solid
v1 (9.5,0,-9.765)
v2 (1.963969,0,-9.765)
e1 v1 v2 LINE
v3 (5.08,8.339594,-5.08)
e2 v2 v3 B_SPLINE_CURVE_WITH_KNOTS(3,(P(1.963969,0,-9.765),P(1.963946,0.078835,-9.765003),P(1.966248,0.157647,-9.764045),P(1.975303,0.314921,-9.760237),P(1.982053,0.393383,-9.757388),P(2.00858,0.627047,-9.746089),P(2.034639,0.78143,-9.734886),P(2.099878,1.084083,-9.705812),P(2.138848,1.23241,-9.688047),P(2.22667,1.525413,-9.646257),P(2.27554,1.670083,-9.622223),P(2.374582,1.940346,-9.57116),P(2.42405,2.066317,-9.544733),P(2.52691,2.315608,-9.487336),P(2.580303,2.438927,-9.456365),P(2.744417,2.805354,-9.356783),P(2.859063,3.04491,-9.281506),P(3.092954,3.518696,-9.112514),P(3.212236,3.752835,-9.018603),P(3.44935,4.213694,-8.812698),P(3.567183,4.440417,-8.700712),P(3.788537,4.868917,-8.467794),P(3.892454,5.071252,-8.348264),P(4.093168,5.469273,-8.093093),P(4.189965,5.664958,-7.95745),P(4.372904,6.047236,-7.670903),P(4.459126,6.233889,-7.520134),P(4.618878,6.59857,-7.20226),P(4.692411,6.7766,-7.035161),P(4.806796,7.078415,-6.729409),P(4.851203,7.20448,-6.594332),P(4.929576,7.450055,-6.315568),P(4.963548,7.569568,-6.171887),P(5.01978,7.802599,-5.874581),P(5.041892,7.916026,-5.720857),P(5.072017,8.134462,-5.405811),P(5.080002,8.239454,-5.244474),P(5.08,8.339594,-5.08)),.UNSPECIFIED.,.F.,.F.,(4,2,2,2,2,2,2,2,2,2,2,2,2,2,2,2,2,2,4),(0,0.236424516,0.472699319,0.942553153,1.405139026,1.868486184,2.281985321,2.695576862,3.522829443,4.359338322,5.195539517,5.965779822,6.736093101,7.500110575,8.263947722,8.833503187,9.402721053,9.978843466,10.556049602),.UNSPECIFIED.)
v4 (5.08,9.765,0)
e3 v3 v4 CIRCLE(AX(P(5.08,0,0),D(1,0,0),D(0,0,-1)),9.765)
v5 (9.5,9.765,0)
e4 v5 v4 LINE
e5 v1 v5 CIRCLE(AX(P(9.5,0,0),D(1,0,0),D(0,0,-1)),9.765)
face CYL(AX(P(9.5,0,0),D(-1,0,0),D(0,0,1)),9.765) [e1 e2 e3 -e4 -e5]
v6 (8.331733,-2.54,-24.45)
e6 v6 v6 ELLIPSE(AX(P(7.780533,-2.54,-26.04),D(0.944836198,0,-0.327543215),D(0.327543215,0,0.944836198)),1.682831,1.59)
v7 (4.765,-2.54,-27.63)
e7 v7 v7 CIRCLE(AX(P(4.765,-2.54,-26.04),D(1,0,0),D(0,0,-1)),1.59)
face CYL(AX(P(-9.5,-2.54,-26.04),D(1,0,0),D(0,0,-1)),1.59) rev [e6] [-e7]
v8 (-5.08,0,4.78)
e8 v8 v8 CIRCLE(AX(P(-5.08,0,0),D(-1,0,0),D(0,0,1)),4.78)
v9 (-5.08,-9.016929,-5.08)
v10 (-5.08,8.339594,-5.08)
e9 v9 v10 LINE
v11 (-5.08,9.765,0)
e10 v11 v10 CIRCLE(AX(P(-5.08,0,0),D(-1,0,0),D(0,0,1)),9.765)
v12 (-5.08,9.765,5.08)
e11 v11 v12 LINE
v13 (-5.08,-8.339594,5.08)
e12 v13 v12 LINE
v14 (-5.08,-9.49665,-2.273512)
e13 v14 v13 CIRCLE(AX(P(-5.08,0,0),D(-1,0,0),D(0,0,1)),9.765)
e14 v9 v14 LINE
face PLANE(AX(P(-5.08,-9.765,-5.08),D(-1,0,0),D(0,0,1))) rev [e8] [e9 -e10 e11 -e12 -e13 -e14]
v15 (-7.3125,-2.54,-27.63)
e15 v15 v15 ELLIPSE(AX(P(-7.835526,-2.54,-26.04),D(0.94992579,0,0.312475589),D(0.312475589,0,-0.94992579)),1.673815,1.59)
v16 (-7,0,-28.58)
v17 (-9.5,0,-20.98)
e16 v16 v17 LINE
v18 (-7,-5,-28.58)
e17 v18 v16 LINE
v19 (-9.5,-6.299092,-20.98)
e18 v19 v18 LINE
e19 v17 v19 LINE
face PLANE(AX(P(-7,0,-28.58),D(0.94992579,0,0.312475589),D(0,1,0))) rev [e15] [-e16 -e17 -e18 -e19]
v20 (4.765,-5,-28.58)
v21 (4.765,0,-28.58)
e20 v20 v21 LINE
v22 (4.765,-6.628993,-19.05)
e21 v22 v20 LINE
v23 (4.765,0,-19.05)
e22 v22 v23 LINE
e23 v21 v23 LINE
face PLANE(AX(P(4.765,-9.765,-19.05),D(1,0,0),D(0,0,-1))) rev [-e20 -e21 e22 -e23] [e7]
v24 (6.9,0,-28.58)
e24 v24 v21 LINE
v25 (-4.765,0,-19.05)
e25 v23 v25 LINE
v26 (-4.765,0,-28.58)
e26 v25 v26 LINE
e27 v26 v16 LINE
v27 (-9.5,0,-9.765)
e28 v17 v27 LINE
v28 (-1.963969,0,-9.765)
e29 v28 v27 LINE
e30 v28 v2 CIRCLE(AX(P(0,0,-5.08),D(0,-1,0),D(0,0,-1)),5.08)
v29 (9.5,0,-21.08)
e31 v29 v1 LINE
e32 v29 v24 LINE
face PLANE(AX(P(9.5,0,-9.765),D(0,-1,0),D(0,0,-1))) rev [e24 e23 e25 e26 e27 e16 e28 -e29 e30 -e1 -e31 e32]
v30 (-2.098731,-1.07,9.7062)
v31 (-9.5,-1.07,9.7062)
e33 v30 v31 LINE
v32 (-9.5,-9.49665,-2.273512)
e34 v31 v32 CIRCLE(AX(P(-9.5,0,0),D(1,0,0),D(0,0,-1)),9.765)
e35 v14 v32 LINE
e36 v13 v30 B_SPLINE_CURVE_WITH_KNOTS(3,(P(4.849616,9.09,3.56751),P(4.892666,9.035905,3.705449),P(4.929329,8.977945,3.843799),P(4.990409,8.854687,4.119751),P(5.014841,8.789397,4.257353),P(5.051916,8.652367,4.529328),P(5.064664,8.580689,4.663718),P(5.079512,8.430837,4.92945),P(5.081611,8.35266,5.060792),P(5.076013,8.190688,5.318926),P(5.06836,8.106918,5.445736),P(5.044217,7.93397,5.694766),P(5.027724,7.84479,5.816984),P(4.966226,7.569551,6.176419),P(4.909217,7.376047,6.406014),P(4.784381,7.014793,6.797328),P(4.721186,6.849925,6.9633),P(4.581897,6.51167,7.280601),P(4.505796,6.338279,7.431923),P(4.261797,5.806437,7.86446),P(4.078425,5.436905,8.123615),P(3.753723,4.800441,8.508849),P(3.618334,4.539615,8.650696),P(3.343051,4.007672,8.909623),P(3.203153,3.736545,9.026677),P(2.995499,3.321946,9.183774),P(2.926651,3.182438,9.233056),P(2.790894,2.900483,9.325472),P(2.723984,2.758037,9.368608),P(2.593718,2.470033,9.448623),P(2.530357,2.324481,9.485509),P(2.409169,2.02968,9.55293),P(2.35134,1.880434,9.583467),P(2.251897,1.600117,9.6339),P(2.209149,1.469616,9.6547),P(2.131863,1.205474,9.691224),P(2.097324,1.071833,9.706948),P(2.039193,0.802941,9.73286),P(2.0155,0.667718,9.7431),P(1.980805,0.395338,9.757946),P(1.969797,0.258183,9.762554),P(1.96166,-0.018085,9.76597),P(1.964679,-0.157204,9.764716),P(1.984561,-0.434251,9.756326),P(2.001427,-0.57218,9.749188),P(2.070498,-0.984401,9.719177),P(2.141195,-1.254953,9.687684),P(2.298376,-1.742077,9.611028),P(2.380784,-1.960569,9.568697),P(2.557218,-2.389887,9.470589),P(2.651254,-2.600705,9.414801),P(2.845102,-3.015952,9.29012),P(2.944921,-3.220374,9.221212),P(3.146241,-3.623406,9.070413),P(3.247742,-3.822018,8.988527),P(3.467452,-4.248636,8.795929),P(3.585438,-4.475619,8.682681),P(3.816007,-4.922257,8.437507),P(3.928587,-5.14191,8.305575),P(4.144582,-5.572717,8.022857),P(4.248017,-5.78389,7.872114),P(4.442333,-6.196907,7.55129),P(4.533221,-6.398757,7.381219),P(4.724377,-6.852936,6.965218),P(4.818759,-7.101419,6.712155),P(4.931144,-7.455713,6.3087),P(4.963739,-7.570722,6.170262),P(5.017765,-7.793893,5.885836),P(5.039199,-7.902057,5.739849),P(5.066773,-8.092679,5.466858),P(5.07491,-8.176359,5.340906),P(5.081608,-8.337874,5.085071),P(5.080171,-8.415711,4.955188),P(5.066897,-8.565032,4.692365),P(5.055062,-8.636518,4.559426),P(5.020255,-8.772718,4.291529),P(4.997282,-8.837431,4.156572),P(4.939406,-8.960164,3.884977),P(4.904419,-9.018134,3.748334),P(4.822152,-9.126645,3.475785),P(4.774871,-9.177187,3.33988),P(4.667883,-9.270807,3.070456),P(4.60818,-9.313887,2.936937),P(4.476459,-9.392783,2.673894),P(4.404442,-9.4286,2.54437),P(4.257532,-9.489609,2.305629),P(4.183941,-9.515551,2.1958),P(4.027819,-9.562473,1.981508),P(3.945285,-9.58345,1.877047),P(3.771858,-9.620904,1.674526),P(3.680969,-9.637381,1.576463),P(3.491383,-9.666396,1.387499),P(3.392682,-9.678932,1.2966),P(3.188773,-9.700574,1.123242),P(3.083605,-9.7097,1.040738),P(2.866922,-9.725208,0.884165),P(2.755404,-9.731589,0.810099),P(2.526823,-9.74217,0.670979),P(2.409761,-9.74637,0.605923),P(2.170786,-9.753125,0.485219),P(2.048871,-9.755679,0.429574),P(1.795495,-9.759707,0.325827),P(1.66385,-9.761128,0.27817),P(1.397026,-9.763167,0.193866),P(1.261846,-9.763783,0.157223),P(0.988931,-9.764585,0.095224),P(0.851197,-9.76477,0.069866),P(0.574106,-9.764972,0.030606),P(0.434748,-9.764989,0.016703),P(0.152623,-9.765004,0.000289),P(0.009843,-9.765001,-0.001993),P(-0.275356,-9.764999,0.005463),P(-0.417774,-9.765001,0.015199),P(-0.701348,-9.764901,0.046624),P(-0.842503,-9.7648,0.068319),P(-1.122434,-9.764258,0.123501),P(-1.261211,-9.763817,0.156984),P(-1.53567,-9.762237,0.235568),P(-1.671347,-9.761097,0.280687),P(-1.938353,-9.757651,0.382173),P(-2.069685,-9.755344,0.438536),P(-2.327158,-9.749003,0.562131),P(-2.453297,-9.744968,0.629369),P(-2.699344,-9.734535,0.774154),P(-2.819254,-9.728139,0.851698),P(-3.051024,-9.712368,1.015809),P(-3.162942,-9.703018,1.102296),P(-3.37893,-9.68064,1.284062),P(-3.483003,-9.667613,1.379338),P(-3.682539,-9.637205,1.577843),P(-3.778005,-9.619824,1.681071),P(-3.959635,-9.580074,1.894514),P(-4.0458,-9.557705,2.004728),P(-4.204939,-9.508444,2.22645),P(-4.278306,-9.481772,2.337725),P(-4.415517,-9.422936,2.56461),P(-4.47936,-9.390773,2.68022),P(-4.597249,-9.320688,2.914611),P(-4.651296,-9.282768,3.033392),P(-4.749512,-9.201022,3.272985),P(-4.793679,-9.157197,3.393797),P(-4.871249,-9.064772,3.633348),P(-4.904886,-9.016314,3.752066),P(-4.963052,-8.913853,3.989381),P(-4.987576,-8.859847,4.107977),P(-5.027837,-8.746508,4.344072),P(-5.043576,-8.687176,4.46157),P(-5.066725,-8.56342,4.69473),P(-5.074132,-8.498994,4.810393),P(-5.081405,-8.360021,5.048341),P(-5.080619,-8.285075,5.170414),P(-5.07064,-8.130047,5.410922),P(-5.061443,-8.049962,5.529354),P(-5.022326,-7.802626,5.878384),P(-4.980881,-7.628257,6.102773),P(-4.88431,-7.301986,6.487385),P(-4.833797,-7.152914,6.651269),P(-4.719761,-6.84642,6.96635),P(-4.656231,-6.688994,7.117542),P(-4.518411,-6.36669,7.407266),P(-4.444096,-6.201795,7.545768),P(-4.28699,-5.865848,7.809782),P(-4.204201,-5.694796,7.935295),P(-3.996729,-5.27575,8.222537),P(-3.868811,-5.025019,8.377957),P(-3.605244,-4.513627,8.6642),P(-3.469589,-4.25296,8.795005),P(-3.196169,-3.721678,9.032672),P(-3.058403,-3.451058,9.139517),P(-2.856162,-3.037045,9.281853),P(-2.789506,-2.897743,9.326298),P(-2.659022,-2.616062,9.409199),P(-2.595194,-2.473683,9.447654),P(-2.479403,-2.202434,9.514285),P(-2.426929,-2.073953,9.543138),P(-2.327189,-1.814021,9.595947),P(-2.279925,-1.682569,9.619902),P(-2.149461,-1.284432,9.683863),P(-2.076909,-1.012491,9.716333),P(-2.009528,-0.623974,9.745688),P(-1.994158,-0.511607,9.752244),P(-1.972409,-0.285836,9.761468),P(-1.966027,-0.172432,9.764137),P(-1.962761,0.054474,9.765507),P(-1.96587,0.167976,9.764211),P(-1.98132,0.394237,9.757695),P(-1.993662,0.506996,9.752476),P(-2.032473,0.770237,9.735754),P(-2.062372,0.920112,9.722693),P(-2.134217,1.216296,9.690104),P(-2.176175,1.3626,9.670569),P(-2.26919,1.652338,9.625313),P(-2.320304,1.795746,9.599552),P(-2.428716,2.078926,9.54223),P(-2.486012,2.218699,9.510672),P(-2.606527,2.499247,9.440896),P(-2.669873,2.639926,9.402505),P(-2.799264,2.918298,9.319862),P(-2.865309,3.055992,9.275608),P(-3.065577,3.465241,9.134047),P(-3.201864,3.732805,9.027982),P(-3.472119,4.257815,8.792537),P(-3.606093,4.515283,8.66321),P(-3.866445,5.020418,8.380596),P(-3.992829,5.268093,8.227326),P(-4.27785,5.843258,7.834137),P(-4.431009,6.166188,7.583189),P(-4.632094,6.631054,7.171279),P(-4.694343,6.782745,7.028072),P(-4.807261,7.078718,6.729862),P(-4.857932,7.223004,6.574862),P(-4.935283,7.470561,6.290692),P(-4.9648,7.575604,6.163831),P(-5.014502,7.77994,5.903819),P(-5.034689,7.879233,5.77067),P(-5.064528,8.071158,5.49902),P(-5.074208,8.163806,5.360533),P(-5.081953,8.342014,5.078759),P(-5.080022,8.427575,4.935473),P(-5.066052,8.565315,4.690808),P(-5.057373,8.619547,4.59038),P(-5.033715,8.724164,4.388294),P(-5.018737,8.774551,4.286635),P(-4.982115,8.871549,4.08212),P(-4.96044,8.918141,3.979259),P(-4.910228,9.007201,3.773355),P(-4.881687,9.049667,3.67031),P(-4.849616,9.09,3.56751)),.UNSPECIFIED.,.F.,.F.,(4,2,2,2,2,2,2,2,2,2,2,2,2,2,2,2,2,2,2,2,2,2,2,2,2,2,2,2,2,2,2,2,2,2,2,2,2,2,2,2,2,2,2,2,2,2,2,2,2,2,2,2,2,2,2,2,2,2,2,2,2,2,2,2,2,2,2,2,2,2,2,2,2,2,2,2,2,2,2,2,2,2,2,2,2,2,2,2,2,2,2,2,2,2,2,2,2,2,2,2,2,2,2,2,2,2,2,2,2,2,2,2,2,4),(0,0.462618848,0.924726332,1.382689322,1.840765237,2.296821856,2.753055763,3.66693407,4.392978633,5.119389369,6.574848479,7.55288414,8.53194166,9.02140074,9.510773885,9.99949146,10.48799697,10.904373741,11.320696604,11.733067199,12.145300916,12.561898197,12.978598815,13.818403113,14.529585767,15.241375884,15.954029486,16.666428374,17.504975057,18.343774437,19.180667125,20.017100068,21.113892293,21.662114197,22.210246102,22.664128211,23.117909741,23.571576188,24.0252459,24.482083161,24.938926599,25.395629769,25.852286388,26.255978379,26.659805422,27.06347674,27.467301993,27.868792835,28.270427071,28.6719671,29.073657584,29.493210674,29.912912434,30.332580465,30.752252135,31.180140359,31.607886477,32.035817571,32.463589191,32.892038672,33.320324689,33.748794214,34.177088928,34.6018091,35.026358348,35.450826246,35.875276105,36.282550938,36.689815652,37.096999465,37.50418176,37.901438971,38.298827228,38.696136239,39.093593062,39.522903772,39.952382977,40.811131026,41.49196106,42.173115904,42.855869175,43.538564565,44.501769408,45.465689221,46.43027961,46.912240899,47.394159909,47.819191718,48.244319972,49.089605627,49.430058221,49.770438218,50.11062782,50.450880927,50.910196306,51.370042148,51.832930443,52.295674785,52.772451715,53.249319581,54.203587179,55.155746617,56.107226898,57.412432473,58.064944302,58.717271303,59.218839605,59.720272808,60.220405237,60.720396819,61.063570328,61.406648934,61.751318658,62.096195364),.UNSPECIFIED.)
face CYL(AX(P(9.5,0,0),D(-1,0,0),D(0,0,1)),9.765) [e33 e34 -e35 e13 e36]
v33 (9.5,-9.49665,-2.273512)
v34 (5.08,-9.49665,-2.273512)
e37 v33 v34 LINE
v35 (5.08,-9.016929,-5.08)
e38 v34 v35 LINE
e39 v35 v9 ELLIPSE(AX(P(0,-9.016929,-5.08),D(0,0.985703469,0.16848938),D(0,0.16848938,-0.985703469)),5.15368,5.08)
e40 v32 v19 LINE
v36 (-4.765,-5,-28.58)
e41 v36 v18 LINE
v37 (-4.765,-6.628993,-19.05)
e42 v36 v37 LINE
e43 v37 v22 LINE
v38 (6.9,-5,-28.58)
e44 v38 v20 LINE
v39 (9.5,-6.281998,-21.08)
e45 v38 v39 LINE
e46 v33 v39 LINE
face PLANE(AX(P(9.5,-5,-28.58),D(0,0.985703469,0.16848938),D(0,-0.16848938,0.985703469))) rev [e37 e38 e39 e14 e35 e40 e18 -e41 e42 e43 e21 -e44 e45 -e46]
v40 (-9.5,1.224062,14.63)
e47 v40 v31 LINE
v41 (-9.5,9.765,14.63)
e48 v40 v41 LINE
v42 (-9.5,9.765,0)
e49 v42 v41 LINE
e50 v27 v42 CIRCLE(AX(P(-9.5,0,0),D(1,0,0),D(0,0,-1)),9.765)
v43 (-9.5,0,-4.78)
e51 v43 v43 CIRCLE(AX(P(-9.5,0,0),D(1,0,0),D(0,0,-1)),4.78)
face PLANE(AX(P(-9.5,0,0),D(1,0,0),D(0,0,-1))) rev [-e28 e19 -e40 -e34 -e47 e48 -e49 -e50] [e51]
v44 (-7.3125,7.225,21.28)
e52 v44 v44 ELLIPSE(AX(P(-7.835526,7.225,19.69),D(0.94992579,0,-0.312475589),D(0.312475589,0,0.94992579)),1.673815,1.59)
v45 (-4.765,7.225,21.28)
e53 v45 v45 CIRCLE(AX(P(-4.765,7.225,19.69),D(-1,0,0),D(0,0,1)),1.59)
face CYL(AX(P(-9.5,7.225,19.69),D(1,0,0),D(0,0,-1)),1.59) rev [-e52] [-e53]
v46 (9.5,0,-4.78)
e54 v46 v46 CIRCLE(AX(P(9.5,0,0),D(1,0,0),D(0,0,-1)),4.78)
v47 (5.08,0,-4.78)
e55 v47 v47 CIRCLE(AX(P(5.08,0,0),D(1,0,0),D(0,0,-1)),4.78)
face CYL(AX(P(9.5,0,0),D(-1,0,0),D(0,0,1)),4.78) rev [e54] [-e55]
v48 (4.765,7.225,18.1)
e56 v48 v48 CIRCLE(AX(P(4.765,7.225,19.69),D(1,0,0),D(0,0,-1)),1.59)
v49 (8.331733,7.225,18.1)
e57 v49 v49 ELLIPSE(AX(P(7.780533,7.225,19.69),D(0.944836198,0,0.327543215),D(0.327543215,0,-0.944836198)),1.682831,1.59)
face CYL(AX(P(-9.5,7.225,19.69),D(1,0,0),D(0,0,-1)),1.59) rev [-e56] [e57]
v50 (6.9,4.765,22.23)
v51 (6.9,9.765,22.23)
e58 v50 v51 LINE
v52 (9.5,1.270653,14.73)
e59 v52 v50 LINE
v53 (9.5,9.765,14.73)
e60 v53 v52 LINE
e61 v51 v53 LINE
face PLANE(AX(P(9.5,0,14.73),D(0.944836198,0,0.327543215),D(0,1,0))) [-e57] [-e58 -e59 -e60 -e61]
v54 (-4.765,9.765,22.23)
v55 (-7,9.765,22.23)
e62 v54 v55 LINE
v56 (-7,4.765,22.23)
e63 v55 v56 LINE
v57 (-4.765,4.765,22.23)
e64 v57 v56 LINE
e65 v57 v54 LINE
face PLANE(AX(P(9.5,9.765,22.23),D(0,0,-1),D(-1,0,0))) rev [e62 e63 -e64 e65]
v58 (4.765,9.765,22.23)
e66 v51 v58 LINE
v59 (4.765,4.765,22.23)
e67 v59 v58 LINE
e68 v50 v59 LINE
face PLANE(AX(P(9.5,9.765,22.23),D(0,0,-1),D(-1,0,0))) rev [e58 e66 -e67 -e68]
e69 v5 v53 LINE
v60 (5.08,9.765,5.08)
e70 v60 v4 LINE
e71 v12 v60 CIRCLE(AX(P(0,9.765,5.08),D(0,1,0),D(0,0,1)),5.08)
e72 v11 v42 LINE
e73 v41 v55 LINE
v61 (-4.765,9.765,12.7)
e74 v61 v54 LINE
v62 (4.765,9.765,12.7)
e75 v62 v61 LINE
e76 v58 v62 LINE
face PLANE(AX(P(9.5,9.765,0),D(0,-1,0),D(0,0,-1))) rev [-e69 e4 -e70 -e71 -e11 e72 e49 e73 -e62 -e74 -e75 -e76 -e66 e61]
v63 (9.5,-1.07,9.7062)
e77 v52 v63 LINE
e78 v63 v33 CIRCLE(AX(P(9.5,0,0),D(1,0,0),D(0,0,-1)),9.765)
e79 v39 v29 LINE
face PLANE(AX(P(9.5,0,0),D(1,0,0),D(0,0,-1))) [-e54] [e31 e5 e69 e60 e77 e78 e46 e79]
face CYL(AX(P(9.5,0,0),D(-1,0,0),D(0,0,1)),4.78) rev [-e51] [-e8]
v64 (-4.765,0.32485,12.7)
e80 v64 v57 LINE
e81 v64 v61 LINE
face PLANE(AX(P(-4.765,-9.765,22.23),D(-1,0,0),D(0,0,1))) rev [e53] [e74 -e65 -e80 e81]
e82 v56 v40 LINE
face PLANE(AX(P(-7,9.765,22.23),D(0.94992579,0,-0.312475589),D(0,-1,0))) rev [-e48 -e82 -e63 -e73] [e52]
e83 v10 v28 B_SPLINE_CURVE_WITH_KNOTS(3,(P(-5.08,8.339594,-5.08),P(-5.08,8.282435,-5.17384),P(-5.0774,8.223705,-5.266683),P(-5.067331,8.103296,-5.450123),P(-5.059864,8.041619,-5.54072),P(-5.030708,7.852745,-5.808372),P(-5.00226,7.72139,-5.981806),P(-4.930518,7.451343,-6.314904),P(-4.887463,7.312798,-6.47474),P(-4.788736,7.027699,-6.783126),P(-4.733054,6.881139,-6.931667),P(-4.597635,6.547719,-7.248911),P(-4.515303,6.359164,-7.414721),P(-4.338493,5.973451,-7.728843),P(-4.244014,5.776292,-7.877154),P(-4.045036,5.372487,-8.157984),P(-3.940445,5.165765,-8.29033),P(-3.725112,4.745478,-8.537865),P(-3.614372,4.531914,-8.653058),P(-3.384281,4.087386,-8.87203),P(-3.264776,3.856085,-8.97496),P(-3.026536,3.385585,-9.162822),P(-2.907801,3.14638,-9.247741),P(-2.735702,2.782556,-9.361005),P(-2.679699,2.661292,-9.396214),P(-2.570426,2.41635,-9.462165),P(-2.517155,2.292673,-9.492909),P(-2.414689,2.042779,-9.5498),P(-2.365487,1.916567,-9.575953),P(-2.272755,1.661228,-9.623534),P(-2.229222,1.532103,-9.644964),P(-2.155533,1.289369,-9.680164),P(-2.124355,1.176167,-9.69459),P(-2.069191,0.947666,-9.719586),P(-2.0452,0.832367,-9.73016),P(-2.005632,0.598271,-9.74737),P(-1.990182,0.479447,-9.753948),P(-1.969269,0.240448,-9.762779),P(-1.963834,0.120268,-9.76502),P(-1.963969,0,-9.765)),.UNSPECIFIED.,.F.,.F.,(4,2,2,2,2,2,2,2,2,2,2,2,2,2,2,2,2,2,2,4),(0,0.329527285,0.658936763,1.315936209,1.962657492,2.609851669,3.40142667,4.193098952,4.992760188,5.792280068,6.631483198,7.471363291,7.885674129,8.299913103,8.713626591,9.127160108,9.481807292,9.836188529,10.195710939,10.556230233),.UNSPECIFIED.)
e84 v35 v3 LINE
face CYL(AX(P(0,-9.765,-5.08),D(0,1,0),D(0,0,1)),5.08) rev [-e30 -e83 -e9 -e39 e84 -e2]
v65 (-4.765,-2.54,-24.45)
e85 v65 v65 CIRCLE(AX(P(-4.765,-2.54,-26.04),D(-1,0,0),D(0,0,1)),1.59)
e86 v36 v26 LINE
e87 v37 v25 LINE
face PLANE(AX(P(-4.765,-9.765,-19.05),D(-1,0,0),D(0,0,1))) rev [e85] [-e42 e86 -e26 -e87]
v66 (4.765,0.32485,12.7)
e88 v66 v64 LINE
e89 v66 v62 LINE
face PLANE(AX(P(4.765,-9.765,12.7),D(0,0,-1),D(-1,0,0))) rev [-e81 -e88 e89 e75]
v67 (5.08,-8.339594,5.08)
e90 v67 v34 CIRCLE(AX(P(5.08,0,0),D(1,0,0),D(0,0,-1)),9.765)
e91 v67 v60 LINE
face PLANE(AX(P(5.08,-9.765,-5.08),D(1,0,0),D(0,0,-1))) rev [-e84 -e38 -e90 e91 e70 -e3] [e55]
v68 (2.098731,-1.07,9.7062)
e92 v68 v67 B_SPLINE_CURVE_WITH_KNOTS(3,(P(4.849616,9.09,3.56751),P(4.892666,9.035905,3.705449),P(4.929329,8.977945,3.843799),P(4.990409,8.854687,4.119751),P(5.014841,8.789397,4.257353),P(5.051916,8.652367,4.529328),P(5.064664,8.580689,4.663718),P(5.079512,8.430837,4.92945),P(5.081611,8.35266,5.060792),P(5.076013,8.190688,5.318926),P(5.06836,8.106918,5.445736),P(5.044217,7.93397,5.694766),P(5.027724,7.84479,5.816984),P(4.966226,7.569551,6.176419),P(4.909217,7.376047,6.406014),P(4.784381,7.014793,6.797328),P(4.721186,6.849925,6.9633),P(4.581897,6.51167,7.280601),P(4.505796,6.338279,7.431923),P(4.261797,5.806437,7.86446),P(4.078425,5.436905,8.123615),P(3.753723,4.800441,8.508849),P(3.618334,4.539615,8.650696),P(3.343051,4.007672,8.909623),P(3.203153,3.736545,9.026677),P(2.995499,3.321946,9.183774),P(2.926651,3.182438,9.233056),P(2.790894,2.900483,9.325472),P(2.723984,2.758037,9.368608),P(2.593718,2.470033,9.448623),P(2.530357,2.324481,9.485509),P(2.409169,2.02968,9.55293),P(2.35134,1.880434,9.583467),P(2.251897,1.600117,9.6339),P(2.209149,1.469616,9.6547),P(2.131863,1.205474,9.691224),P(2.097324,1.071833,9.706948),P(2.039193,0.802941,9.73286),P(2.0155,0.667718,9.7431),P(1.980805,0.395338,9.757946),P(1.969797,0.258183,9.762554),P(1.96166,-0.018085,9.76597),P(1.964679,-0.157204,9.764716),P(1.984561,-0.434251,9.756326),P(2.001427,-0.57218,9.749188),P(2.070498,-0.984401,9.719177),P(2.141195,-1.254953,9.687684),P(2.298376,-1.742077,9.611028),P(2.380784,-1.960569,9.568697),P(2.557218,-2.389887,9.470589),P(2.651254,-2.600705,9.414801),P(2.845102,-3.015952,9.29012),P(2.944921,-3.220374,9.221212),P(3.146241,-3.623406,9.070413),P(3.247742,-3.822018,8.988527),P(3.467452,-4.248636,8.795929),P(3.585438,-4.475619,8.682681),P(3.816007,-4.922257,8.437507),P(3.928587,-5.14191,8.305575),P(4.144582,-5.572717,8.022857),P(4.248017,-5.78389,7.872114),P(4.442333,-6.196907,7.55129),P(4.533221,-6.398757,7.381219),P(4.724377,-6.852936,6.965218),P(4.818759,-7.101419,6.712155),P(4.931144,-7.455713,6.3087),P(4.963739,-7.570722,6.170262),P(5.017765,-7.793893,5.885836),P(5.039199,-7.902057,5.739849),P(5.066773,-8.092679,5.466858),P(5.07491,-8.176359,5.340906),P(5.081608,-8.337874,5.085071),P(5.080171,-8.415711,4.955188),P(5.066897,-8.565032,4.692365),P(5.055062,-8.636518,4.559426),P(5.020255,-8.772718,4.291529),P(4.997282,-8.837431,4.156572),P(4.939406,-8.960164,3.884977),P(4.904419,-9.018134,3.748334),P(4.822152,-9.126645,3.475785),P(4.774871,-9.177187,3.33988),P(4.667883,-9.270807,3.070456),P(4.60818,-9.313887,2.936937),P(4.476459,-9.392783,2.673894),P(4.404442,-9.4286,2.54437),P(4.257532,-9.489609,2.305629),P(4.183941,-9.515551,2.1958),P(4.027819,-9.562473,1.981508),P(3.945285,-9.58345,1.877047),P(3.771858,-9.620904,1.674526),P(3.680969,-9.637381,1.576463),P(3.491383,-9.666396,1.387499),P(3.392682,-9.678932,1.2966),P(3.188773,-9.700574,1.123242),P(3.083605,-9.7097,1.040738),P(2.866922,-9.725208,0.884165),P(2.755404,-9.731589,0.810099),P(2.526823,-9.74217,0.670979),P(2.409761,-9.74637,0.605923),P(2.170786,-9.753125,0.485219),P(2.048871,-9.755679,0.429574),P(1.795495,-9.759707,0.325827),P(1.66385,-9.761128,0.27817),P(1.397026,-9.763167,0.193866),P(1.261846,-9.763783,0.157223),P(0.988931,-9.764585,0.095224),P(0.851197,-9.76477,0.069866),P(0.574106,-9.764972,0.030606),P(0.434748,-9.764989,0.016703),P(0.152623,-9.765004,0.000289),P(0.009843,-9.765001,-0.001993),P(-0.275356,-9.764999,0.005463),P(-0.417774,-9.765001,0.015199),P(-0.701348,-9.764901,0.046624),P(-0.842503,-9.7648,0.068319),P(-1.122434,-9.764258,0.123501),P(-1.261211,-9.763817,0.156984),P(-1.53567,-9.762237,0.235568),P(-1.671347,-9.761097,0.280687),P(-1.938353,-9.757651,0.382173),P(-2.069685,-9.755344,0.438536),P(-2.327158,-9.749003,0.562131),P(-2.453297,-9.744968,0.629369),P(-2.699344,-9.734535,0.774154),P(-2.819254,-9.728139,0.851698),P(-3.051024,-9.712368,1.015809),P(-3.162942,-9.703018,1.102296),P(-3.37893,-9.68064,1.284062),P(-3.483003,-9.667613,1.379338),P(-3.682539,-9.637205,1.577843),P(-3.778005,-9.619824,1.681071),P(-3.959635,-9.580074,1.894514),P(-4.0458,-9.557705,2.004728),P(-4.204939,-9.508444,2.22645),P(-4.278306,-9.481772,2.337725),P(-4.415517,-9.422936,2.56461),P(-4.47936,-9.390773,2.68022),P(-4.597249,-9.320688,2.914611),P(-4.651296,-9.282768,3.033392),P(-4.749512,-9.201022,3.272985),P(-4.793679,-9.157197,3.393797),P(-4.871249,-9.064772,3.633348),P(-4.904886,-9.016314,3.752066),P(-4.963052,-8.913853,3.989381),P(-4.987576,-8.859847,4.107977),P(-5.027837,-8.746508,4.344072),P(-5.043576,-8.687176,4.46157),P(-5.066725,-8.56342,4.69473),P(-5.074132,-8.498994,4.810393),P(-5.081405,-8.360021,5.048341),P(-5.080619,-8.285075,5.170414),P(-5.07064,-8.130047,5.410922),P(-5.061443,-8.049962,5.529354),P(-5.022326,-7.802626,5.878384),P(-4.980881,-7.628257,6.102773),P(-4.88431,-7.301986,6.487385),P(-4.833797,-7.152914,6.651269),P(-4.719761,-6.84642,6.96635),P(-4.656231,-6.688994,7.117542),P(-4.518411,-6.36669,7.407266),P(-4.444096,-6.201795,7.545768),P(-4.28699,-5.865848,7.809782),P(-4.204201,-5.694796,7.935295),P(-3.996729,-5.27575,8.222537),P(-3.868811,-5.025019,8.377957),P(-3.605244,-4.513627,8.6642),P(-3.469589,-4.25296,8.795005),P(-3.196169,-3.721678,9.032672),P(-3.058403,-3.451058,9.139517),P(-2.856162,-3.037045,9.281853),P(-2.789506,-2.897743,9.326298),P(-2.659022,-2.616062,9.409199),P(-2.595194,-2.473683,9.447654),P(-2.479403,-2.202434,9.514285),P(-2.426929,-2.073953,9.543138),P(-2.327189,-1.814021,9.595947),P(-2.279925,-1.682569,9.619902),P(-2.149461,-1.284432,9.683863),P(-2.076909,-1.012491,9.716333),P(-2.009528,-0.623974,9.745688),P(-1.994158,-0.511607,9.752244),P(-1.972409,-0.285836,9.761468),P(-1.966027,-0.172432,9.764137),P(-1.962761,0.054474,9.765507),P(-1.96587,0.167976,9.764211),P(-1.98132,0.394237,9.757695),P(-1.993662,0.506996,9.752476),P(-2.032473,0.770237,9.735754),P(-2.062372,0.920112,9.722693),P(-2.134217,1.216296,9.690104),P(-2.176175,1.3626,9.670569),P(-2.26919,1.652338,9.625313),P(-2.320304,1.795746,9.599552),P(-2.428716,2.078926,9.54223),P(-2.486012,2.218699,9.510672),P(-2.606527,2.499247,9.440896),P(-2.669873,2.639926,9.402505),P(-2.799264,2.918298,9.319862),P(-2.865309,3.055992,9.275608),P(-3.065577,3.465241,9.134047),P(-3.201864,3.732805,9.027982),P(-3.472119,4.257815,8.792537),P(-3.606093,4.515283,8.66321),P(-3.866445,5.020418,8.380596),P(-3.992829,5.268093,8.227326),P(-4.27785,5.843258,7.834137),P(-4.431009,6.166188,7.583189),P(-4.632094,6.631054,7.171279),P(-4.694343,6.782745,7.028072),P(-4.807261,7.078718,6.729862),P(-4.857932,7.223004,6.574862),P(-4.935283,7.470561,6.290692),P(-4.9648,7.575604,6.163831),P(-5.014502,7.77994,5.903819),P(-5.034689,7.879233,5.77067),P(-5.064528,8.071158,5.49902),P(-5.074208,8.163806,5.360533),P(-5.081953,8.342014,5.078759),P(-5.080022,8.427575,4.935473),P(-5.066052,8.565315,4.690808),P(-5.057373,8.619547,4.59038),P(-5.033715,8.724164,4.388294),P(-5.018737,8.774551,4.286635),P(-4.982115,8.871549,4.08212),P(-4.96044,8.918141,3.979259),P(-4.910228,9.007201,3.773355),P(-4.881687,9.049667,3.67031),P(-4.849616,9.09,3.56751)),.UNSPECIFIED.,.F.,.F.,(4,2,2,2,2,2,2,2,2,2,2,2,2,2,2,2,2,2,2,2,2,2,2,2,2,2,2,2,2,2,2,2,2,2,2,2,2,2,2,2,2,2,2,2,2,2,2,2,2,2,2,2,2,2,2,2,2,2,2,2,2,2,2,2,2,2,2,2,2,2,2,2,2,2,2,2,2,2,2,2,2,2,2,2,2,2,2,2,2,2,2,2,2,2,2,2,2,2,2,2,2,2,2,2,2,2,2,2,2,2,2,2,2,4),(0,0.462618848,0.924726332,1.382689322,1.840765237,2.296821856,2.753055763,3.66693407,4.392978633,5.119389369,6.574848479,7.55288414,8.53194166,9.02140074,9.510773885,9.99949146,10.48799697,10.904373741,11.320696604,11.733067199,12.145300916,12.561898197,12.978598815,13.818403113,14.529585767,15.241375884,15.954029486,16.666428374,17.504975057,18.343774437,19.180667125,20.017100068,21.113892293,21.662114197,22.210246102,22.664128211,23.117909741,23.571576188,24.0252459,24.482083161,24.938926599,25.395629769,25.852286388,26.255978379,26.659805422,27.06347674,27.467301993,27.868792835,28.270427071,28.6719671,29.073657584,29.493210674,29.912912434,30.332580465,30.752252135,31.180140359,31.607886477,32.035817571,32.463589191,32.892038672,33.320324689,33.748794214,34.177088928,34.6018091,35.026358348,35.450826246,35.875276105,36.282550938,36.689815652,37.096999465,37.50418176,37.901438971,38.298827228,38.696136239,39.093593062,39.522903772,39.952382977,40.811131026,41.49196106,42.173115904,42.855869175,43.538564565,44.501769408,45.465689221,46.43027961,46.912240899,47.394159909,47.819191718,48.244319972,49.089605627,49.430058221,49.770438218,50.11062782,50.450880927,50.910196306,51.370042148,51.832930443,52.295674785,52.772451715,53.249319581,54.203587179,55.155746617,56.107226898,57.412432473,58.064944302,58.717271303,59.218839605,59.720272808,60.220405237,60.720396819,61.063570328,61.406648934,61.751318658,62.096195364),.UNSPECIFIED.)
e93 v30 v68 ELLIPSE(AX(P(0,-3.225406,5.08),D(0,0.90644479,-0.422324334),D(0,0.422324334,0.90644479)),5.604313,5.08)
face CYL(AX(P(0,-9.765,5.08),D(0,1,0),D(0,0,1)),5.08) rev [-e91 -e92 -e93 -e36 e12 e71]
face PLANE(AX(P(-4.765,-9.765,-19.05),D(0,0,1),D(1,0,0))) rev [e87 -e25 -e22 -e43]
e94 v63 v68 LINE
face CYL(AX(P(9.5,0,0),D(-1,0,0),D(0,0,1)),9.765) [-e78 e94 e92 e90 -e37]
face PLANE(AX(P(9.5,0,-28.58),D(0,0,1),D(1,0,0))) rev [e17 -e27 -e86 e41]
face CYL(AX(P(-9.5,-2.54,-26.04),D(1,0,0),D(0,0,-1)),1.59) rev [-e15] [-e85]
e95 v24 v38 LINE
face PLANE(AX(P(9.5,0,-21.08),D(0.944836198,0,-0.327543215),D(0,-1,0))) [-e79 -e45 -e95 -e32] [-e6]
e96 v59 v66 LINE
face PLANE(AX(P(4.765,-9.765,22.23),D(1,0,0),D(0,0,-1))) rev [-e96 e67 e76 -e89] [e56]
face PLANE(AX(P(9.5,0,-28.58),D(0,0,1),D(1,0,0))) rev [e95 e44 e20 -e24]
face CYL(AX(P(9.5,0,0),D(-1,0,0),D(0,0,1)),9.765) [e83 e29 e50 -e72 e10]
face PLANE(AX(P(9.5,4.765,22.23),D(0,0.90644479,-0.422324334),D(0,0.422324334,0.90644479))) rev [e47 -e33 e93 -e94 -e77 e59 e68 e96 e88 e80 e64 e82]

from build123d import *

# Parameters (mm, degrees)
SKETCH1_R               = 4.78
BOSS_EXTRUDE1_DEPTH     = 9.5
CUT_EXTRUDE1_DEPTH      = 32.661042702
CUT_EXTRUDE1_DEPTH_BACK = 32.661042702
SKETCH2_W               = 9.53
SKETCH2_H               = 9.53
CUT_EXTRUDE2_DEPTH      = 32.661042763
CUT_EXTRUDE2_DEPTH_BACK = 32.661042763
SKETCH3_R               = 1.59
CHAMFER1_SIZE           = 7.5
CHAMFER1_SIZE_2         = 2.6
CHAMFER2_SIZE           = 2.5
CHAMFER2_SIZE_2         = 7.6


with BuildPart() as part:
    # Sketch1 → Boss-Extrude1 (new, symmetric)
    with BuildSketch(Plane(origin=(0, 0, 0), x_dir=(0, 0, -1), z_dir=(1, 0, 0))):
        with BuildLine():
            Line((9.765, 0), (28.58, 0))
            Line((28.58, 0), (28.58, -5))
            Line((28.58, -5), (2.273512356, -9.496650281))
            ThreePointArc((2.273512356, -9.496650281), (-5.618124367, -7.986983385), (-9.706200338, -1.07))
            Line((-9.706200338, -1.07), (-22.23, 4.765))
            Line((-22.23, 4.765), (-22.23, 9.765))
            Line((-22.23, 9.765), (0, 9.765))
            ThreePointArc((0, 9.765), (6.904897718, 6.904897718), (9.765, 0))
        make_face()
        Circle(SKETCH1_R, mode=Mode.SUBTRACT)
    extrude(amount=BOSS_EXTRUDE1_DEPTH, both=True)

    # Sketch2 → Cut-Extrude1 (cut, two sides: drawn at the far end of the back side and taken through both)
    with BuildSketch(Plane(origin=(0, 0, 0), x_dir=(1, 0, 0), z_dir=(0, 1, 0)).offset(-CUT_EXTRUDE1_DEPTH_BACK)):
        with Locations((0, 23.815)):
            Rectangle(SKETCH2_W, SKETCH2_H)
        with BuildLine():
            Line((5.08, 5.08), (5.08, -5.08))
            ThreePointArc((5.08, -5.08), (0, -10.16), (-5.08, -5.08))
            Line((-5.08, -5.08), (-5.08, 5.08))
            ThreePointArc((-5.08, 5.08), (0, 10.16), (5.08, 5.08))
        make_face()
        with Locations((0, -17.465)):
            Rectangle(SKETCH2_W, SKETCH2_H)
    extrude(amount=CUT_EXTRUDE1_DEPTH + CUT_EXTRUDE1_DEPTH_BACK, mode=Mode.SUBTRACT)

    # Sketch3 → Cut-Extrude2 (cut, two sides: drawn at the far end of the back side and taken through both)
    with BuildSketch(Plane(origin=(0, 0, 0), x_dir=(0, 0, -1), z_dir=(1, 0, 0)).offset(-CUT_EXTRUDE2_DEPTH_BACK)):
        with Locations((-19.69, 7.225)):
            Circle(SKETCH3_R)
        with Locations((26.04, -2.54)):
            Circle(SKETCH3_R)
    extrude(amount=CUT_EXTRUDE2_DEPTH + CUT_EXTRUDE2_DEPTH_BACK, mode=Mode.SUBTRACT)

    # Chamfer1
    # the kernel refuses this chamfer: 7.5, 2.6 mm, written as the material it takes off along each edge
    with BuildSketch(Plane(origin=(9.5, -14.695177751, 22.23), x_dir=(0.01262359546550246, 0, -0.9999203192442502), z_dir=(0, 1, 0)), Plane(origin=(9.5, 19.460177751, -28.58), x_dir=(0.012623595465502456, 0, 0.9999203192442502), z_dir=(0, -1, 0))) as chamfer1_piece_1:
        Polygon((CHAMFER1_SIZE * 0.999920319244, CHAMFER1_SIZE * 0.0126235954655), (-CHAMFER1_SIZE_2 * 0.0126235954655, CHAMFER1_SIZE_2 * 0.999920319244), (0, 0), align=None)
    extrude(amount=43.920355501, mode=Mode.SUBTRACT)

    # Chamfer2
    # the kernel refuses this chamfer: 7.6, 2.5 mm, written as the material it takes off along each edge
    with BuildSketch(Plane(origin=(-9.5, -14.958373363, 22.23), x_dir=(0.9938650173465227, 0, 0.11059985214635677), z_dir=(0, 1, 0))) as chamfer2_piece_1:
        Polygon((CHAMFER2_SIZE * 0.993865017347, CHAMFER2_SIZE * 0.110599852146), (-CHAMFER2_SIZE_2 * 0.110599852146, CHAMFER2_SIZE_2 * 0.993865017347), (0, 0), align=None)
    extrude(amount=44.446746726, mode=Mode.SUBTRACT)
    with BuildSketch(Plane(origin=(-9.5, 19.723373363, -28.58), x_dir=(-0.012040610047615204, 0, 0.9999275092273846), z_dir=(0, -1, 0))) as chamfer2_piece_2:
        Polygon((CHAMFER2_SIZE_2 * 0.999927509227, -CHAMFER2_SIZE_2 * 0.0120406100476), (-CHAMFER2_SIZE * 0.0120406100476, -CHAMFER2_SIZE * 0.999927509227), (0, 0), align=None)
    extrude(amount=44.446746726, mode=Mode.SUBTRACT)


solid = part.part
